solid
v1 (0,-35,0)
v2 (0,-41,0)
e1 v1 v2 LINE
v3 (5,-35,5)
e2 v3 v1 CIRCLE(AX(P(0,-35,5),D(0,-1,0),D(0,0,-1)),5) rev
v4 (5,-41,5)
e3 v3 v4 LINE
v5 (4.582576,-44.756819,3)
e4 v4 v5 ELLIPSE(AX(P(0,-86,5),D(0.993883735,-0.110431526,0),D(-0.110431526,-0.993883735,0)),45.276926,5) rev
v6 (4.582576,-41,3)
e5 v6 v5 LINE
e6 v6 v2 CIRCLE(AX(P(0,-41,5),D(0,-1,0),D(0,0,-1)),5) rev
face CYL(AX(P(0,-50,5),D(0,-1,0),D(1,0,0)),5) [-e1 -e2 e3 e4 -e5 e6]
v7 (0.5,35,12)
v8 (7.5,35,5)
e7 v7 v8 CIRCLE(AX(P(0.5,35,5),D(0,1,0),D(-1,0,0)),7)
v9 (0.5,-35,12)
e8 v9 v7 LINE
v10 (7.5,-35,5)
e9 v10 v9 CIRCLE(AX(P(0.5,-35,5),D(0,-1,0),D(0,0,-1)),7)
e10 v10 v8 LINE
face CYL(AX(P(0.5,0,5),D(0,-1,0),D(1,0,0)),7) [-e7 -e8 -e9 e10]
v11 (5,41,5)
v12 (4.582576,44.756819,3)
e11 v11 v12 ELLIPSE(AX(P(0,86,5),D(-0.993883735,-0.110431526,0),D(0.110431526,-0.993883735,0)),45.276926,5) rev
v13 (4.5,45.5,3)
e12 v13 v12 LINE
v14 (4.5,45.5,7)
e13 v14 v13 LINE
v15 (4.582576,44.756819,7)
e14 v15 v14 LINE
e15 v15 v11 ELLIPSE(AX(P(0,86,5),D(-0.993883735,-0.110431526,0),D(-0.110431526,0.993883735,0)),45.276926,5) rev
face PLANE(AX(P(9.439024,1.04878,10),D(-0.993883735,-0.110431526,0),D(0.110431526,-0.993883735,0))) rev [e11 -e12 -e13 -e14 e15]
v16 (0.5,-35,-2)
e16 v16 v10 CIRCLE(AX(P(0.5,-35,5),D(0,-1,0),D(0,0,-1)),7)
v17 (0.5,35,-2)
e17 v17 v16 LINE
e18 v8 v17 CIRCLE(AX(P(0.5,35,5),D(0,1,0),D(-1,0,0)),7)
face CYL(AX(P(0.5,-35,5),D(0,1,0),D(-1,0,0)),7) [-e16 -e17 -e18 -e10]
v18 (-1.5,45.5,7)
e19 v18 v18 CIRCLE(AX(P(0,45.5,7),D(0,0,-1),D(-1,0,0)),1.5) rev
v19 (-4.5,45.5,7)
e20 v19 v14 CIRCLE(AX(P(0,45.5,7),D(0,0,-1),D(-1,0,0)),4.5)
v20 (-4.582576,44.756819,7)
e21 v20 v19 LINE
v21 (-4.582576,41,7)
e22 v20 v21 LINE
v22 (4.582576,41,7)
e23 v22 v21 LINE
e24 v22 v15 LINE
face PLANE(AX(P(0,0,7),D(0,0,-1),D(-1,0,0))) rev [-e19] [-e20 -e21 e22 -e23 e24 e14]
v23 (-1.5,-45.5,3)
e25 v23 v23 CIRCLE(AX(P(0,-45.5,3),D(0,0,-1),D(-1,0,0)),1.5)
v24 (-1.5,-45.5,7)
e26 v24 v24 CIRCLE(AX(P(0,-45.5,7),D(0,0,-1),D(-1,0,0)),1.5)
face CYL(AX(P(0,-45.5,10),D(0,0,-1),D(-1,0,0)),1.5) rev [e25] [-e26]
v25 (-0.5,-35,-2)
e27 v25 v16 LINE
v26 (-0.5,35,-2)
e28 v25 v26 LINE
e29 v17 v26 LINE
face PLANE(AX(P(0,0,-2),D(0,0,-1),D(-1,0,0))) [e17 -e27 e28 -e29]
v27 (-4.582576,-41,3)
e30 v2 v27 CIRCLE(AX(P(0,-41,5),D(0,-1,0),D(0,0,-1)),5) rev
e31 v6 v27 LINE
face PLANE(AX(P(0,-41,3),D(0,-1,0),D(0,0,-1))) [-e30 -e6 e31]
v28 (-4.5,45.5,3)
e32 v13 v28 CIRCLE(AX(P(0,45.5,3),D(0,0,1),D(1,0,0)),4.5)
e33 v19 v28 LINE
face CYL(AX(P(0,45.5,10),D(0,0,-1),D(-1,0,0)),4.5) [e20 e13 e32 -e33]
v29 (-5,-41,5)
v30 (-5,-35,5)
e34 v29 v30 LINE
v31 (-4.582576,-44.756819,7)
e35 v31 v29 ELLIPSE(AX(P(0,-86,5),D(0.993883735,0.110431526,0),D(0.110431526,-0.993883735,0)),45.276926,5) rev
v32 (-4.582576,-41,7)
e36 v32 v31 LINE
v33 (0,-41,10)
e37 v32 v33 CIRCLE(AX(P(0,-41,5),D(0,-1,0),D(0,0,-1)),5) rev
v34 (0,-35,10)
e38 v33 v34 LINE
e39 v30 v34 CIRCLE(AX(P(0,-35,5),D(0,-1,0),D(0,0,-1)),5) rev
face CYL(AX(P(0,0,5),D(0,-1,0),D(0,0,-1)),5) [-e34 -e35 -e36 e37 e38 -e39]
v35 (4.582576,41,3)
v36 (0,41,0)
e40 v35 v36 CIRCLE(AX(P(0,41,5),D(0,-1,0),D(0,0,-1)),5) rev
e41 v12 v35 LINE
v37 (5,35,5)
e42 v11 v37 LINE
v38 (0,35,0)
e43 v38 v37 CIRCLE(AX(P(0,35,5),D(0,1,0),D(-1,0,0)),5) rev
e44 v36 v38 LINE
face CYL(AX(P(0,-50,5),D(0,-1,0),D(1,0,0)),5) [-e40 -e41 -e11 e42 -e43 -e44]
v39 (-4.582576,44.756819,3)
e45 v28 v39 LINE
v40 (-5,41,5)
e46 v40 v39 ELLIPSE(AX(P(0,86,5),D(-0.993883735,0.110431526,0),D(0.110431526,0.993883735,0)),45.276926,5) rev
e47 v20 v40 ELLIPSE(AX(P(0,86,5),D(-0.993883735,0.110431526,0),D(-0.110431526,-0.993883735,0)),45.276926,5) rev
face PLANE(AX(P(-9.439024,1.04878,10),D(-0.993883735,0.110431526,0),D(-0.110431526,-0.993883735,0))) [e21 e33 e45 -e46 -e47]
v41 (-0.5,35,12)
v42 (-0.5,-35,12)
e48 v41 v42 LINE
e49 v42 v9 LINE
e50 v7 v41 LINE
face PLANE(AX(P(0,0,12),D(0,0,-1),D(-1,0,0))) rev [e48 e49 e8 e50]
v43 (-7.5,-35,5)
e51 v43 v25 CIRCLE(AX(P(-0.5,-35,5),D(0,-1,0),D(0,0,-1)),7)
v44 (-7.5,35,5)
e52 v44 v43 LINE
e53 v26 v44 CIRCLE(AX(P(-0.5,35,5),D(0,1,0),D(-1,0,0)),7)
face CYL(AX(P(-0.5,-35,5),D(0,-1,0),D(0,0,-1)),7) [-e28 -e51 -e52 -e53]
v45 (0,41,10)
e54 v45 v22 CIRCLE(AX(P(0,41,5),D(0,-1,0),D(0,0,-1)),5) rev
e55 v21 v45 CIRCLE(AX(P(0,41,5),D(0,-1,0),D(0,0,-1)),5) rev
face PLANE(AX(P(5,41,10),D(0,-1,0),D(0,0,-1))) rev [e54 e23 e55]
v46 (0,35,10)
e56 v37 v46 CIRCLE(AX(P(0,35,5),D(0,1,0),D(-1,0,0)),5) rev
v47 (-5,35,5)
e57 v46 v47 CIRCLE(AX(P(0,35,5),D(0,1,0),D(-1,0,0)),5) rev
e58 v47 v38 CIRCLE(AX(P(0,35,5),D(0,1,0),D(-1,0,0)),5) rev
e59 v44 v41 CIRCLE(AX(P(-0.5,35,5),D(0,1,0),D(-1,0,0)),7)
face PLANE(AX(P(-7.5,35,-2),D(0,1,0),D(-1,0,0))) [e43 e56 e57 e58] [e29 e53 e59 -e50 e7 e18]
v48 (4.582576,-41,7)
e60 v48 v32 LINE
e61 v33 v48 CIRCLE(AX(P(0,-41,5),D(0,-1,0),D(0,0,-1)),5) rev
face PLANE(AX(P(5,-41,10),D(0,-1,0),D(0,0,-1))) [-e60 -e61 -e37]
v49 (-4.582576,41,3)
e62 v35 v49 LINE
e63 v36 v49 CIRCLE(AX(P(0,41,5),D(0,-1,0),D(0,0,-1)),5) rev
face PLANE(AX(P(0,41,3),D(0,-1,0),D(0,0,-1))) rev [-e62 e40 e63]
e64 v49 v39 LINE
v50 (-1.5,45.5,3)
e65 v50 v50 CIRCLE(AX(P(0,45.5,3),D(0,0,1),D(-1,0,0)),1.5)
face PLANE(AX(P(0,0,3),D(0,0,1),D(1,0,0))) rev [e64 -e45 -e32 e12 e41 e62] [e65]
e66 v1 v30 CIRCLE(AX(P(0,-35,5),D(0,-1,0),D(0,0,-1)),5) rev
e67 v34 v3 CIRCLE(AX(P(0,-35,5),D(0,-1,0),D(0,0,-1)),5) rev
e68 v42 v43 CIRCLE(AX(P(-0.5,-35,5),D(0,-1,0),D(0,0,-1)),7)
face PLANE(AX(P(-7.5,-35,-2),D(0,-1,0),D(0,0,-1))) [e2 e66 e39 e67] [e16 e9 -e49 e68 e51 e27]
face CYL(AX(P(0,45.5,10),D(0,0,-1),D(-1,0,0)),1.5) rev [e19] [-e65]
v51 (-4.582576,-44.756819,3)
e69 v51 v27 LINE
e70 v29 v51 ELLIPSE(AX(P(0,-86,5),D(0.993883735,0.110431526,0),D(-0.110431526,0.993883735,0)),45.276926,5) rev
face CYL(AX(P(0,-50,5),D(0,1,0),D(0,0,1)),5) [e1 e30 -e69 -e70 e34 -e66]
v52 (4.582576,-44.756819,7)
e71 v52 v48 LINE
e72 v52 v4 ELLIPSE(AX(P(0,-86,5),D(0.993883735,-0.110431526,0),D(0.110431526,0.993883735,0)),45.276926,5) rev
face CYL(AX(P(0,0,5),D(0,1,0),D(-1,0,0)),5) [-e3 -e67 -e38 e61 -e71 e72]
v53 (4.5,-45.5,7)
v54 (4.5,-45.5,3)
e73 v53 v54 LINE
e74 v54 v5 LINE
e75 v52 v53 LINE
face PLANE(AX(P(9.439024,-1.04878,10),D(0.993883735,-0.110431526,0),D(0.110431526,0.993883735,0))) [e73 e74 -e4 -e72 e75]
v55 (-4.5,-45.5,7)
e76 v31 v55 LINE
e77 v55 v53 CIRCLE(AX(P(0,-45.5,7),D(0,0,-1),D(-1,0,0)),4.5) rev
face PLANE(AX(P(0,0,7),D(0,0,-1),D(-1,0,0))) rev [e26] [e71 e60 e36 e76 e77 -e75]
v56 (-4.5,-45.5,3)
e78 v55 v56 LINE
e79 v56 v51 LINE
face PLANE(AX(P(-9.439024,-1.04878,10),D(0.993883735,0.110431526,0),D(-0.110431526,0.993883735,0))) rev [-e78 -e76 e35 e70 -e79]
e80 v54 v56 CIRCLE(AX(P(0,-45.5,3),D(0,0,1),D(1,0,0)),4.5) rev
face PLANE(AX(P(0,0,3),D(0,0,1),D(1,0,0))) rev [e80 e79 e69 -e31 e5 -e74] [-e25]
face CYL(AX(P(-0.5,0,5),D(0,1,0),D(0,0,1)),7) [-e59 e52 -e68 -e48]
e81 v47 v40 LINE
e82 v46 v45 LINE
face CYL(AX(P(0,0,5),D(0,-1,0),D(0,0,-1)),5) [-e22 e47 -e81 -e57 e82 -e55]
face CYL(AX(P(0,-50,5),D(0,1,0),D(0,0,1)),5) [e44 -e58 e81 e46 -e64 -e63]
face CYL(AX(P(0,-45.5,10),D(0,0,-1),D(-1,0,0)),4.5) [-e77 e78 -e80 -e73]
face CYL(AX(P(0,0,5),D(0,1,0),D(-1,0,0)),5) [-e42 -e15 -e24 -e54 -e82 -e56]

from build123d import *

# Parameters (mm, degrees)
SKETCH2_W                = 10
SKETCH2_H                = 100
BOSS_EXTRUDE1_DEPTH      = 10
FILLET1_R                = 5
CUT_EXTRUDE1_DEPTH       = 3
CUT_EXTRUDE2_START       = 7
SKETCH3_2_W              = 10
SKETCH3_2_H              = 9
CUT_EXTRUDE2_DEPTH       = 3
CUT_EXTRUDE4_START       = -4
CUT_EXTRUDE4_DEPTH       = 56.23475383
SKETCH7_R                = 1.5
CUT_EXTRUDE5_DEPTH       = 51.734603576
BOSS_EXTRUDE2_DEPTH      = 7
BOSS_EXTRUDE2_DEPTH_BACK = 7
SKETCH9_W                = 15
SKETCH9_H                = 70
FILLET3_R                = 7


with BuildPart() as part:
    # Sketch2 → Boss-Extrude1 (new body)
    with BuildSketch(Plane.XY):
        Rectangle(SKETCH2_W, SKETCH2_H)
    extrude(amount=BOSS_EXTRUDE1_DEPTH)

    # Fillet1
    fillet1_edges = [part.edges().sort_by_distance(p)[0] for p in [
        (-5, 0, 0),
        (5, 0, 0),
        (5, 0, 10),
        (-5, 0, 10),
    ]]
    fillet(fillet1_edges, radius=FILLET1_R - 0.0001)  # a hair under: the kernel refuses the full size

    # Sketch3 → Cut-Extrude1 (cut)
    with BuildSketch(Plane.XY):
        with BuildLine():
            Line((-5, -41), (-4.5, -45.5))
            ThreePointArc((-4.5, -45.5), (0, -50), (4.5, -45.5))
            Line((4.5, -45.5), (5, -41))
            Line((5, -41), (-5, -41))
        make_face()
        with BuildLine():
            Line((0, -50), (5, -50))
            Line((5, -50), (5, -41))
            Line((5, -41), (4.5, -45.5))
            ThreePointArc((4.5, -45.5), (3.181980515, -48.681980515), (0, -50))
        make_face()
        with BuildLine():
            Line((-5, -50), (0, -50))
            ThreePointArc((0, -50), (-3.181980515, -48.681980515), (-4.5, -45.5))
            Line((-4.5, -45.5), (-5, -41))
            Line((-5, -41), (-5, -50))
        make_face()
    cut_extrude1 = extrude(amount=CUT_EXTRUDE1_DEPTH, mode=Mode.SUBTRACT)

    # Sketch3<2> → Cut-Extrude2 (cut)
    with BuildSketch(Plane.XY.offset(CUT_EXTRUDE2_START)):
        with Locations((0, -45.5)):
            Rectangle(SKETCH3_2_W, SKETCH3_2_H)
    cut_extrude2 = extrude(amount=CUT_EXTRUDE2_DEPTH, mode=Mode.SUBTRACT)

    # Mirror1: Cut-Extrude1, Cut-Extrude2 across plane
    add(cut_extrude1.mirror(Plane.ZX), mode=Mode.SUBTRACT)
    add(cut_extrude2.mirror(Plane.ZX), mode=Mode.SUBTRACT)

    # Sketch3<4> → Cut-Extrude4 (cut)
    with BuildSketch(Plane.XY.offset(CUT_EXTRUDE4_START)):
        with BuildLine():
            Line((0, -50), (5, -50))
            Line((5, -50), (5, -41))
            Line((5, -41), (4.5, -45.5))
            ThreePointArc((4.5, -45.5), (3.181980515, -48.681980515), (0, -50))
        make_face()
        with BuildLine():
            Line((-5, -50), (0, -50))
            ThreePointArc((0, -50), (-3.181980515, -48.681980515), (-4.5, -45.5))
            Line((-4.5, -45.5), (-5, -41))
            Line((-5, -41), (-5, -50))
        make_face()
    cut_extrude4 = extrude(amount=CUT_EXTRUDE4_DEPTH, mode=Mode.SUBTRACT)

    # Sketch7 → Cut-Extrude5 (cut, through all)
    with BuildSketch(Plane(origin=(0, 0, 3), x_dir=(-1, 0, 0), z_dir=(0, 0, -1))):
        with Locations((0, -45.5)):
            Circle(SKETCH7_R)
    cut_extrude5 = extrude(amount=-CUT_EXTRUDE5_DEPTH, mode=Mode.SUBTRACT)

    # Mirror3: Cut-Extrude5 across plane
    add(cut_extrude5.mirror(Plane.ZX), mode=Mode.SUBTRACT)

    # Mirror4: Cut-Extrude4 across plane
    add(cut_extrude4.mirror(Plane.ZX), mode=Mode.SUBTRACT)

    # Sketch9 → Boss-Extrude2 (add, two sides: drawn at the far end of the back side and taken through both)
    with BuildSketch(Plane.XY.offset(5).offset(-BOSS_EXTRUDE2_DEPTH_BACK)):
        Rectangle(SKETCH9_W, SKETCH9_H)
    extrude(amount=BOSS_EXTRUDE2_DEPTH + BOSS_EXTRUDE2_DEPTH_BACK)

    # Fillet3
    fillet3_edges = [part.edges().sort_by_distance(p)[0] for p in [
        (-7.5, 0, 12),
        (7.5, 0, 12),
        (7.5, 0, -2),
        (-7.5, 0, -2),
    ]]
    fillet(fillet3_edges, radius=FILLET3_R - 0.0001)  # a hair under: the kernel refuses the full size


solid = part.part
